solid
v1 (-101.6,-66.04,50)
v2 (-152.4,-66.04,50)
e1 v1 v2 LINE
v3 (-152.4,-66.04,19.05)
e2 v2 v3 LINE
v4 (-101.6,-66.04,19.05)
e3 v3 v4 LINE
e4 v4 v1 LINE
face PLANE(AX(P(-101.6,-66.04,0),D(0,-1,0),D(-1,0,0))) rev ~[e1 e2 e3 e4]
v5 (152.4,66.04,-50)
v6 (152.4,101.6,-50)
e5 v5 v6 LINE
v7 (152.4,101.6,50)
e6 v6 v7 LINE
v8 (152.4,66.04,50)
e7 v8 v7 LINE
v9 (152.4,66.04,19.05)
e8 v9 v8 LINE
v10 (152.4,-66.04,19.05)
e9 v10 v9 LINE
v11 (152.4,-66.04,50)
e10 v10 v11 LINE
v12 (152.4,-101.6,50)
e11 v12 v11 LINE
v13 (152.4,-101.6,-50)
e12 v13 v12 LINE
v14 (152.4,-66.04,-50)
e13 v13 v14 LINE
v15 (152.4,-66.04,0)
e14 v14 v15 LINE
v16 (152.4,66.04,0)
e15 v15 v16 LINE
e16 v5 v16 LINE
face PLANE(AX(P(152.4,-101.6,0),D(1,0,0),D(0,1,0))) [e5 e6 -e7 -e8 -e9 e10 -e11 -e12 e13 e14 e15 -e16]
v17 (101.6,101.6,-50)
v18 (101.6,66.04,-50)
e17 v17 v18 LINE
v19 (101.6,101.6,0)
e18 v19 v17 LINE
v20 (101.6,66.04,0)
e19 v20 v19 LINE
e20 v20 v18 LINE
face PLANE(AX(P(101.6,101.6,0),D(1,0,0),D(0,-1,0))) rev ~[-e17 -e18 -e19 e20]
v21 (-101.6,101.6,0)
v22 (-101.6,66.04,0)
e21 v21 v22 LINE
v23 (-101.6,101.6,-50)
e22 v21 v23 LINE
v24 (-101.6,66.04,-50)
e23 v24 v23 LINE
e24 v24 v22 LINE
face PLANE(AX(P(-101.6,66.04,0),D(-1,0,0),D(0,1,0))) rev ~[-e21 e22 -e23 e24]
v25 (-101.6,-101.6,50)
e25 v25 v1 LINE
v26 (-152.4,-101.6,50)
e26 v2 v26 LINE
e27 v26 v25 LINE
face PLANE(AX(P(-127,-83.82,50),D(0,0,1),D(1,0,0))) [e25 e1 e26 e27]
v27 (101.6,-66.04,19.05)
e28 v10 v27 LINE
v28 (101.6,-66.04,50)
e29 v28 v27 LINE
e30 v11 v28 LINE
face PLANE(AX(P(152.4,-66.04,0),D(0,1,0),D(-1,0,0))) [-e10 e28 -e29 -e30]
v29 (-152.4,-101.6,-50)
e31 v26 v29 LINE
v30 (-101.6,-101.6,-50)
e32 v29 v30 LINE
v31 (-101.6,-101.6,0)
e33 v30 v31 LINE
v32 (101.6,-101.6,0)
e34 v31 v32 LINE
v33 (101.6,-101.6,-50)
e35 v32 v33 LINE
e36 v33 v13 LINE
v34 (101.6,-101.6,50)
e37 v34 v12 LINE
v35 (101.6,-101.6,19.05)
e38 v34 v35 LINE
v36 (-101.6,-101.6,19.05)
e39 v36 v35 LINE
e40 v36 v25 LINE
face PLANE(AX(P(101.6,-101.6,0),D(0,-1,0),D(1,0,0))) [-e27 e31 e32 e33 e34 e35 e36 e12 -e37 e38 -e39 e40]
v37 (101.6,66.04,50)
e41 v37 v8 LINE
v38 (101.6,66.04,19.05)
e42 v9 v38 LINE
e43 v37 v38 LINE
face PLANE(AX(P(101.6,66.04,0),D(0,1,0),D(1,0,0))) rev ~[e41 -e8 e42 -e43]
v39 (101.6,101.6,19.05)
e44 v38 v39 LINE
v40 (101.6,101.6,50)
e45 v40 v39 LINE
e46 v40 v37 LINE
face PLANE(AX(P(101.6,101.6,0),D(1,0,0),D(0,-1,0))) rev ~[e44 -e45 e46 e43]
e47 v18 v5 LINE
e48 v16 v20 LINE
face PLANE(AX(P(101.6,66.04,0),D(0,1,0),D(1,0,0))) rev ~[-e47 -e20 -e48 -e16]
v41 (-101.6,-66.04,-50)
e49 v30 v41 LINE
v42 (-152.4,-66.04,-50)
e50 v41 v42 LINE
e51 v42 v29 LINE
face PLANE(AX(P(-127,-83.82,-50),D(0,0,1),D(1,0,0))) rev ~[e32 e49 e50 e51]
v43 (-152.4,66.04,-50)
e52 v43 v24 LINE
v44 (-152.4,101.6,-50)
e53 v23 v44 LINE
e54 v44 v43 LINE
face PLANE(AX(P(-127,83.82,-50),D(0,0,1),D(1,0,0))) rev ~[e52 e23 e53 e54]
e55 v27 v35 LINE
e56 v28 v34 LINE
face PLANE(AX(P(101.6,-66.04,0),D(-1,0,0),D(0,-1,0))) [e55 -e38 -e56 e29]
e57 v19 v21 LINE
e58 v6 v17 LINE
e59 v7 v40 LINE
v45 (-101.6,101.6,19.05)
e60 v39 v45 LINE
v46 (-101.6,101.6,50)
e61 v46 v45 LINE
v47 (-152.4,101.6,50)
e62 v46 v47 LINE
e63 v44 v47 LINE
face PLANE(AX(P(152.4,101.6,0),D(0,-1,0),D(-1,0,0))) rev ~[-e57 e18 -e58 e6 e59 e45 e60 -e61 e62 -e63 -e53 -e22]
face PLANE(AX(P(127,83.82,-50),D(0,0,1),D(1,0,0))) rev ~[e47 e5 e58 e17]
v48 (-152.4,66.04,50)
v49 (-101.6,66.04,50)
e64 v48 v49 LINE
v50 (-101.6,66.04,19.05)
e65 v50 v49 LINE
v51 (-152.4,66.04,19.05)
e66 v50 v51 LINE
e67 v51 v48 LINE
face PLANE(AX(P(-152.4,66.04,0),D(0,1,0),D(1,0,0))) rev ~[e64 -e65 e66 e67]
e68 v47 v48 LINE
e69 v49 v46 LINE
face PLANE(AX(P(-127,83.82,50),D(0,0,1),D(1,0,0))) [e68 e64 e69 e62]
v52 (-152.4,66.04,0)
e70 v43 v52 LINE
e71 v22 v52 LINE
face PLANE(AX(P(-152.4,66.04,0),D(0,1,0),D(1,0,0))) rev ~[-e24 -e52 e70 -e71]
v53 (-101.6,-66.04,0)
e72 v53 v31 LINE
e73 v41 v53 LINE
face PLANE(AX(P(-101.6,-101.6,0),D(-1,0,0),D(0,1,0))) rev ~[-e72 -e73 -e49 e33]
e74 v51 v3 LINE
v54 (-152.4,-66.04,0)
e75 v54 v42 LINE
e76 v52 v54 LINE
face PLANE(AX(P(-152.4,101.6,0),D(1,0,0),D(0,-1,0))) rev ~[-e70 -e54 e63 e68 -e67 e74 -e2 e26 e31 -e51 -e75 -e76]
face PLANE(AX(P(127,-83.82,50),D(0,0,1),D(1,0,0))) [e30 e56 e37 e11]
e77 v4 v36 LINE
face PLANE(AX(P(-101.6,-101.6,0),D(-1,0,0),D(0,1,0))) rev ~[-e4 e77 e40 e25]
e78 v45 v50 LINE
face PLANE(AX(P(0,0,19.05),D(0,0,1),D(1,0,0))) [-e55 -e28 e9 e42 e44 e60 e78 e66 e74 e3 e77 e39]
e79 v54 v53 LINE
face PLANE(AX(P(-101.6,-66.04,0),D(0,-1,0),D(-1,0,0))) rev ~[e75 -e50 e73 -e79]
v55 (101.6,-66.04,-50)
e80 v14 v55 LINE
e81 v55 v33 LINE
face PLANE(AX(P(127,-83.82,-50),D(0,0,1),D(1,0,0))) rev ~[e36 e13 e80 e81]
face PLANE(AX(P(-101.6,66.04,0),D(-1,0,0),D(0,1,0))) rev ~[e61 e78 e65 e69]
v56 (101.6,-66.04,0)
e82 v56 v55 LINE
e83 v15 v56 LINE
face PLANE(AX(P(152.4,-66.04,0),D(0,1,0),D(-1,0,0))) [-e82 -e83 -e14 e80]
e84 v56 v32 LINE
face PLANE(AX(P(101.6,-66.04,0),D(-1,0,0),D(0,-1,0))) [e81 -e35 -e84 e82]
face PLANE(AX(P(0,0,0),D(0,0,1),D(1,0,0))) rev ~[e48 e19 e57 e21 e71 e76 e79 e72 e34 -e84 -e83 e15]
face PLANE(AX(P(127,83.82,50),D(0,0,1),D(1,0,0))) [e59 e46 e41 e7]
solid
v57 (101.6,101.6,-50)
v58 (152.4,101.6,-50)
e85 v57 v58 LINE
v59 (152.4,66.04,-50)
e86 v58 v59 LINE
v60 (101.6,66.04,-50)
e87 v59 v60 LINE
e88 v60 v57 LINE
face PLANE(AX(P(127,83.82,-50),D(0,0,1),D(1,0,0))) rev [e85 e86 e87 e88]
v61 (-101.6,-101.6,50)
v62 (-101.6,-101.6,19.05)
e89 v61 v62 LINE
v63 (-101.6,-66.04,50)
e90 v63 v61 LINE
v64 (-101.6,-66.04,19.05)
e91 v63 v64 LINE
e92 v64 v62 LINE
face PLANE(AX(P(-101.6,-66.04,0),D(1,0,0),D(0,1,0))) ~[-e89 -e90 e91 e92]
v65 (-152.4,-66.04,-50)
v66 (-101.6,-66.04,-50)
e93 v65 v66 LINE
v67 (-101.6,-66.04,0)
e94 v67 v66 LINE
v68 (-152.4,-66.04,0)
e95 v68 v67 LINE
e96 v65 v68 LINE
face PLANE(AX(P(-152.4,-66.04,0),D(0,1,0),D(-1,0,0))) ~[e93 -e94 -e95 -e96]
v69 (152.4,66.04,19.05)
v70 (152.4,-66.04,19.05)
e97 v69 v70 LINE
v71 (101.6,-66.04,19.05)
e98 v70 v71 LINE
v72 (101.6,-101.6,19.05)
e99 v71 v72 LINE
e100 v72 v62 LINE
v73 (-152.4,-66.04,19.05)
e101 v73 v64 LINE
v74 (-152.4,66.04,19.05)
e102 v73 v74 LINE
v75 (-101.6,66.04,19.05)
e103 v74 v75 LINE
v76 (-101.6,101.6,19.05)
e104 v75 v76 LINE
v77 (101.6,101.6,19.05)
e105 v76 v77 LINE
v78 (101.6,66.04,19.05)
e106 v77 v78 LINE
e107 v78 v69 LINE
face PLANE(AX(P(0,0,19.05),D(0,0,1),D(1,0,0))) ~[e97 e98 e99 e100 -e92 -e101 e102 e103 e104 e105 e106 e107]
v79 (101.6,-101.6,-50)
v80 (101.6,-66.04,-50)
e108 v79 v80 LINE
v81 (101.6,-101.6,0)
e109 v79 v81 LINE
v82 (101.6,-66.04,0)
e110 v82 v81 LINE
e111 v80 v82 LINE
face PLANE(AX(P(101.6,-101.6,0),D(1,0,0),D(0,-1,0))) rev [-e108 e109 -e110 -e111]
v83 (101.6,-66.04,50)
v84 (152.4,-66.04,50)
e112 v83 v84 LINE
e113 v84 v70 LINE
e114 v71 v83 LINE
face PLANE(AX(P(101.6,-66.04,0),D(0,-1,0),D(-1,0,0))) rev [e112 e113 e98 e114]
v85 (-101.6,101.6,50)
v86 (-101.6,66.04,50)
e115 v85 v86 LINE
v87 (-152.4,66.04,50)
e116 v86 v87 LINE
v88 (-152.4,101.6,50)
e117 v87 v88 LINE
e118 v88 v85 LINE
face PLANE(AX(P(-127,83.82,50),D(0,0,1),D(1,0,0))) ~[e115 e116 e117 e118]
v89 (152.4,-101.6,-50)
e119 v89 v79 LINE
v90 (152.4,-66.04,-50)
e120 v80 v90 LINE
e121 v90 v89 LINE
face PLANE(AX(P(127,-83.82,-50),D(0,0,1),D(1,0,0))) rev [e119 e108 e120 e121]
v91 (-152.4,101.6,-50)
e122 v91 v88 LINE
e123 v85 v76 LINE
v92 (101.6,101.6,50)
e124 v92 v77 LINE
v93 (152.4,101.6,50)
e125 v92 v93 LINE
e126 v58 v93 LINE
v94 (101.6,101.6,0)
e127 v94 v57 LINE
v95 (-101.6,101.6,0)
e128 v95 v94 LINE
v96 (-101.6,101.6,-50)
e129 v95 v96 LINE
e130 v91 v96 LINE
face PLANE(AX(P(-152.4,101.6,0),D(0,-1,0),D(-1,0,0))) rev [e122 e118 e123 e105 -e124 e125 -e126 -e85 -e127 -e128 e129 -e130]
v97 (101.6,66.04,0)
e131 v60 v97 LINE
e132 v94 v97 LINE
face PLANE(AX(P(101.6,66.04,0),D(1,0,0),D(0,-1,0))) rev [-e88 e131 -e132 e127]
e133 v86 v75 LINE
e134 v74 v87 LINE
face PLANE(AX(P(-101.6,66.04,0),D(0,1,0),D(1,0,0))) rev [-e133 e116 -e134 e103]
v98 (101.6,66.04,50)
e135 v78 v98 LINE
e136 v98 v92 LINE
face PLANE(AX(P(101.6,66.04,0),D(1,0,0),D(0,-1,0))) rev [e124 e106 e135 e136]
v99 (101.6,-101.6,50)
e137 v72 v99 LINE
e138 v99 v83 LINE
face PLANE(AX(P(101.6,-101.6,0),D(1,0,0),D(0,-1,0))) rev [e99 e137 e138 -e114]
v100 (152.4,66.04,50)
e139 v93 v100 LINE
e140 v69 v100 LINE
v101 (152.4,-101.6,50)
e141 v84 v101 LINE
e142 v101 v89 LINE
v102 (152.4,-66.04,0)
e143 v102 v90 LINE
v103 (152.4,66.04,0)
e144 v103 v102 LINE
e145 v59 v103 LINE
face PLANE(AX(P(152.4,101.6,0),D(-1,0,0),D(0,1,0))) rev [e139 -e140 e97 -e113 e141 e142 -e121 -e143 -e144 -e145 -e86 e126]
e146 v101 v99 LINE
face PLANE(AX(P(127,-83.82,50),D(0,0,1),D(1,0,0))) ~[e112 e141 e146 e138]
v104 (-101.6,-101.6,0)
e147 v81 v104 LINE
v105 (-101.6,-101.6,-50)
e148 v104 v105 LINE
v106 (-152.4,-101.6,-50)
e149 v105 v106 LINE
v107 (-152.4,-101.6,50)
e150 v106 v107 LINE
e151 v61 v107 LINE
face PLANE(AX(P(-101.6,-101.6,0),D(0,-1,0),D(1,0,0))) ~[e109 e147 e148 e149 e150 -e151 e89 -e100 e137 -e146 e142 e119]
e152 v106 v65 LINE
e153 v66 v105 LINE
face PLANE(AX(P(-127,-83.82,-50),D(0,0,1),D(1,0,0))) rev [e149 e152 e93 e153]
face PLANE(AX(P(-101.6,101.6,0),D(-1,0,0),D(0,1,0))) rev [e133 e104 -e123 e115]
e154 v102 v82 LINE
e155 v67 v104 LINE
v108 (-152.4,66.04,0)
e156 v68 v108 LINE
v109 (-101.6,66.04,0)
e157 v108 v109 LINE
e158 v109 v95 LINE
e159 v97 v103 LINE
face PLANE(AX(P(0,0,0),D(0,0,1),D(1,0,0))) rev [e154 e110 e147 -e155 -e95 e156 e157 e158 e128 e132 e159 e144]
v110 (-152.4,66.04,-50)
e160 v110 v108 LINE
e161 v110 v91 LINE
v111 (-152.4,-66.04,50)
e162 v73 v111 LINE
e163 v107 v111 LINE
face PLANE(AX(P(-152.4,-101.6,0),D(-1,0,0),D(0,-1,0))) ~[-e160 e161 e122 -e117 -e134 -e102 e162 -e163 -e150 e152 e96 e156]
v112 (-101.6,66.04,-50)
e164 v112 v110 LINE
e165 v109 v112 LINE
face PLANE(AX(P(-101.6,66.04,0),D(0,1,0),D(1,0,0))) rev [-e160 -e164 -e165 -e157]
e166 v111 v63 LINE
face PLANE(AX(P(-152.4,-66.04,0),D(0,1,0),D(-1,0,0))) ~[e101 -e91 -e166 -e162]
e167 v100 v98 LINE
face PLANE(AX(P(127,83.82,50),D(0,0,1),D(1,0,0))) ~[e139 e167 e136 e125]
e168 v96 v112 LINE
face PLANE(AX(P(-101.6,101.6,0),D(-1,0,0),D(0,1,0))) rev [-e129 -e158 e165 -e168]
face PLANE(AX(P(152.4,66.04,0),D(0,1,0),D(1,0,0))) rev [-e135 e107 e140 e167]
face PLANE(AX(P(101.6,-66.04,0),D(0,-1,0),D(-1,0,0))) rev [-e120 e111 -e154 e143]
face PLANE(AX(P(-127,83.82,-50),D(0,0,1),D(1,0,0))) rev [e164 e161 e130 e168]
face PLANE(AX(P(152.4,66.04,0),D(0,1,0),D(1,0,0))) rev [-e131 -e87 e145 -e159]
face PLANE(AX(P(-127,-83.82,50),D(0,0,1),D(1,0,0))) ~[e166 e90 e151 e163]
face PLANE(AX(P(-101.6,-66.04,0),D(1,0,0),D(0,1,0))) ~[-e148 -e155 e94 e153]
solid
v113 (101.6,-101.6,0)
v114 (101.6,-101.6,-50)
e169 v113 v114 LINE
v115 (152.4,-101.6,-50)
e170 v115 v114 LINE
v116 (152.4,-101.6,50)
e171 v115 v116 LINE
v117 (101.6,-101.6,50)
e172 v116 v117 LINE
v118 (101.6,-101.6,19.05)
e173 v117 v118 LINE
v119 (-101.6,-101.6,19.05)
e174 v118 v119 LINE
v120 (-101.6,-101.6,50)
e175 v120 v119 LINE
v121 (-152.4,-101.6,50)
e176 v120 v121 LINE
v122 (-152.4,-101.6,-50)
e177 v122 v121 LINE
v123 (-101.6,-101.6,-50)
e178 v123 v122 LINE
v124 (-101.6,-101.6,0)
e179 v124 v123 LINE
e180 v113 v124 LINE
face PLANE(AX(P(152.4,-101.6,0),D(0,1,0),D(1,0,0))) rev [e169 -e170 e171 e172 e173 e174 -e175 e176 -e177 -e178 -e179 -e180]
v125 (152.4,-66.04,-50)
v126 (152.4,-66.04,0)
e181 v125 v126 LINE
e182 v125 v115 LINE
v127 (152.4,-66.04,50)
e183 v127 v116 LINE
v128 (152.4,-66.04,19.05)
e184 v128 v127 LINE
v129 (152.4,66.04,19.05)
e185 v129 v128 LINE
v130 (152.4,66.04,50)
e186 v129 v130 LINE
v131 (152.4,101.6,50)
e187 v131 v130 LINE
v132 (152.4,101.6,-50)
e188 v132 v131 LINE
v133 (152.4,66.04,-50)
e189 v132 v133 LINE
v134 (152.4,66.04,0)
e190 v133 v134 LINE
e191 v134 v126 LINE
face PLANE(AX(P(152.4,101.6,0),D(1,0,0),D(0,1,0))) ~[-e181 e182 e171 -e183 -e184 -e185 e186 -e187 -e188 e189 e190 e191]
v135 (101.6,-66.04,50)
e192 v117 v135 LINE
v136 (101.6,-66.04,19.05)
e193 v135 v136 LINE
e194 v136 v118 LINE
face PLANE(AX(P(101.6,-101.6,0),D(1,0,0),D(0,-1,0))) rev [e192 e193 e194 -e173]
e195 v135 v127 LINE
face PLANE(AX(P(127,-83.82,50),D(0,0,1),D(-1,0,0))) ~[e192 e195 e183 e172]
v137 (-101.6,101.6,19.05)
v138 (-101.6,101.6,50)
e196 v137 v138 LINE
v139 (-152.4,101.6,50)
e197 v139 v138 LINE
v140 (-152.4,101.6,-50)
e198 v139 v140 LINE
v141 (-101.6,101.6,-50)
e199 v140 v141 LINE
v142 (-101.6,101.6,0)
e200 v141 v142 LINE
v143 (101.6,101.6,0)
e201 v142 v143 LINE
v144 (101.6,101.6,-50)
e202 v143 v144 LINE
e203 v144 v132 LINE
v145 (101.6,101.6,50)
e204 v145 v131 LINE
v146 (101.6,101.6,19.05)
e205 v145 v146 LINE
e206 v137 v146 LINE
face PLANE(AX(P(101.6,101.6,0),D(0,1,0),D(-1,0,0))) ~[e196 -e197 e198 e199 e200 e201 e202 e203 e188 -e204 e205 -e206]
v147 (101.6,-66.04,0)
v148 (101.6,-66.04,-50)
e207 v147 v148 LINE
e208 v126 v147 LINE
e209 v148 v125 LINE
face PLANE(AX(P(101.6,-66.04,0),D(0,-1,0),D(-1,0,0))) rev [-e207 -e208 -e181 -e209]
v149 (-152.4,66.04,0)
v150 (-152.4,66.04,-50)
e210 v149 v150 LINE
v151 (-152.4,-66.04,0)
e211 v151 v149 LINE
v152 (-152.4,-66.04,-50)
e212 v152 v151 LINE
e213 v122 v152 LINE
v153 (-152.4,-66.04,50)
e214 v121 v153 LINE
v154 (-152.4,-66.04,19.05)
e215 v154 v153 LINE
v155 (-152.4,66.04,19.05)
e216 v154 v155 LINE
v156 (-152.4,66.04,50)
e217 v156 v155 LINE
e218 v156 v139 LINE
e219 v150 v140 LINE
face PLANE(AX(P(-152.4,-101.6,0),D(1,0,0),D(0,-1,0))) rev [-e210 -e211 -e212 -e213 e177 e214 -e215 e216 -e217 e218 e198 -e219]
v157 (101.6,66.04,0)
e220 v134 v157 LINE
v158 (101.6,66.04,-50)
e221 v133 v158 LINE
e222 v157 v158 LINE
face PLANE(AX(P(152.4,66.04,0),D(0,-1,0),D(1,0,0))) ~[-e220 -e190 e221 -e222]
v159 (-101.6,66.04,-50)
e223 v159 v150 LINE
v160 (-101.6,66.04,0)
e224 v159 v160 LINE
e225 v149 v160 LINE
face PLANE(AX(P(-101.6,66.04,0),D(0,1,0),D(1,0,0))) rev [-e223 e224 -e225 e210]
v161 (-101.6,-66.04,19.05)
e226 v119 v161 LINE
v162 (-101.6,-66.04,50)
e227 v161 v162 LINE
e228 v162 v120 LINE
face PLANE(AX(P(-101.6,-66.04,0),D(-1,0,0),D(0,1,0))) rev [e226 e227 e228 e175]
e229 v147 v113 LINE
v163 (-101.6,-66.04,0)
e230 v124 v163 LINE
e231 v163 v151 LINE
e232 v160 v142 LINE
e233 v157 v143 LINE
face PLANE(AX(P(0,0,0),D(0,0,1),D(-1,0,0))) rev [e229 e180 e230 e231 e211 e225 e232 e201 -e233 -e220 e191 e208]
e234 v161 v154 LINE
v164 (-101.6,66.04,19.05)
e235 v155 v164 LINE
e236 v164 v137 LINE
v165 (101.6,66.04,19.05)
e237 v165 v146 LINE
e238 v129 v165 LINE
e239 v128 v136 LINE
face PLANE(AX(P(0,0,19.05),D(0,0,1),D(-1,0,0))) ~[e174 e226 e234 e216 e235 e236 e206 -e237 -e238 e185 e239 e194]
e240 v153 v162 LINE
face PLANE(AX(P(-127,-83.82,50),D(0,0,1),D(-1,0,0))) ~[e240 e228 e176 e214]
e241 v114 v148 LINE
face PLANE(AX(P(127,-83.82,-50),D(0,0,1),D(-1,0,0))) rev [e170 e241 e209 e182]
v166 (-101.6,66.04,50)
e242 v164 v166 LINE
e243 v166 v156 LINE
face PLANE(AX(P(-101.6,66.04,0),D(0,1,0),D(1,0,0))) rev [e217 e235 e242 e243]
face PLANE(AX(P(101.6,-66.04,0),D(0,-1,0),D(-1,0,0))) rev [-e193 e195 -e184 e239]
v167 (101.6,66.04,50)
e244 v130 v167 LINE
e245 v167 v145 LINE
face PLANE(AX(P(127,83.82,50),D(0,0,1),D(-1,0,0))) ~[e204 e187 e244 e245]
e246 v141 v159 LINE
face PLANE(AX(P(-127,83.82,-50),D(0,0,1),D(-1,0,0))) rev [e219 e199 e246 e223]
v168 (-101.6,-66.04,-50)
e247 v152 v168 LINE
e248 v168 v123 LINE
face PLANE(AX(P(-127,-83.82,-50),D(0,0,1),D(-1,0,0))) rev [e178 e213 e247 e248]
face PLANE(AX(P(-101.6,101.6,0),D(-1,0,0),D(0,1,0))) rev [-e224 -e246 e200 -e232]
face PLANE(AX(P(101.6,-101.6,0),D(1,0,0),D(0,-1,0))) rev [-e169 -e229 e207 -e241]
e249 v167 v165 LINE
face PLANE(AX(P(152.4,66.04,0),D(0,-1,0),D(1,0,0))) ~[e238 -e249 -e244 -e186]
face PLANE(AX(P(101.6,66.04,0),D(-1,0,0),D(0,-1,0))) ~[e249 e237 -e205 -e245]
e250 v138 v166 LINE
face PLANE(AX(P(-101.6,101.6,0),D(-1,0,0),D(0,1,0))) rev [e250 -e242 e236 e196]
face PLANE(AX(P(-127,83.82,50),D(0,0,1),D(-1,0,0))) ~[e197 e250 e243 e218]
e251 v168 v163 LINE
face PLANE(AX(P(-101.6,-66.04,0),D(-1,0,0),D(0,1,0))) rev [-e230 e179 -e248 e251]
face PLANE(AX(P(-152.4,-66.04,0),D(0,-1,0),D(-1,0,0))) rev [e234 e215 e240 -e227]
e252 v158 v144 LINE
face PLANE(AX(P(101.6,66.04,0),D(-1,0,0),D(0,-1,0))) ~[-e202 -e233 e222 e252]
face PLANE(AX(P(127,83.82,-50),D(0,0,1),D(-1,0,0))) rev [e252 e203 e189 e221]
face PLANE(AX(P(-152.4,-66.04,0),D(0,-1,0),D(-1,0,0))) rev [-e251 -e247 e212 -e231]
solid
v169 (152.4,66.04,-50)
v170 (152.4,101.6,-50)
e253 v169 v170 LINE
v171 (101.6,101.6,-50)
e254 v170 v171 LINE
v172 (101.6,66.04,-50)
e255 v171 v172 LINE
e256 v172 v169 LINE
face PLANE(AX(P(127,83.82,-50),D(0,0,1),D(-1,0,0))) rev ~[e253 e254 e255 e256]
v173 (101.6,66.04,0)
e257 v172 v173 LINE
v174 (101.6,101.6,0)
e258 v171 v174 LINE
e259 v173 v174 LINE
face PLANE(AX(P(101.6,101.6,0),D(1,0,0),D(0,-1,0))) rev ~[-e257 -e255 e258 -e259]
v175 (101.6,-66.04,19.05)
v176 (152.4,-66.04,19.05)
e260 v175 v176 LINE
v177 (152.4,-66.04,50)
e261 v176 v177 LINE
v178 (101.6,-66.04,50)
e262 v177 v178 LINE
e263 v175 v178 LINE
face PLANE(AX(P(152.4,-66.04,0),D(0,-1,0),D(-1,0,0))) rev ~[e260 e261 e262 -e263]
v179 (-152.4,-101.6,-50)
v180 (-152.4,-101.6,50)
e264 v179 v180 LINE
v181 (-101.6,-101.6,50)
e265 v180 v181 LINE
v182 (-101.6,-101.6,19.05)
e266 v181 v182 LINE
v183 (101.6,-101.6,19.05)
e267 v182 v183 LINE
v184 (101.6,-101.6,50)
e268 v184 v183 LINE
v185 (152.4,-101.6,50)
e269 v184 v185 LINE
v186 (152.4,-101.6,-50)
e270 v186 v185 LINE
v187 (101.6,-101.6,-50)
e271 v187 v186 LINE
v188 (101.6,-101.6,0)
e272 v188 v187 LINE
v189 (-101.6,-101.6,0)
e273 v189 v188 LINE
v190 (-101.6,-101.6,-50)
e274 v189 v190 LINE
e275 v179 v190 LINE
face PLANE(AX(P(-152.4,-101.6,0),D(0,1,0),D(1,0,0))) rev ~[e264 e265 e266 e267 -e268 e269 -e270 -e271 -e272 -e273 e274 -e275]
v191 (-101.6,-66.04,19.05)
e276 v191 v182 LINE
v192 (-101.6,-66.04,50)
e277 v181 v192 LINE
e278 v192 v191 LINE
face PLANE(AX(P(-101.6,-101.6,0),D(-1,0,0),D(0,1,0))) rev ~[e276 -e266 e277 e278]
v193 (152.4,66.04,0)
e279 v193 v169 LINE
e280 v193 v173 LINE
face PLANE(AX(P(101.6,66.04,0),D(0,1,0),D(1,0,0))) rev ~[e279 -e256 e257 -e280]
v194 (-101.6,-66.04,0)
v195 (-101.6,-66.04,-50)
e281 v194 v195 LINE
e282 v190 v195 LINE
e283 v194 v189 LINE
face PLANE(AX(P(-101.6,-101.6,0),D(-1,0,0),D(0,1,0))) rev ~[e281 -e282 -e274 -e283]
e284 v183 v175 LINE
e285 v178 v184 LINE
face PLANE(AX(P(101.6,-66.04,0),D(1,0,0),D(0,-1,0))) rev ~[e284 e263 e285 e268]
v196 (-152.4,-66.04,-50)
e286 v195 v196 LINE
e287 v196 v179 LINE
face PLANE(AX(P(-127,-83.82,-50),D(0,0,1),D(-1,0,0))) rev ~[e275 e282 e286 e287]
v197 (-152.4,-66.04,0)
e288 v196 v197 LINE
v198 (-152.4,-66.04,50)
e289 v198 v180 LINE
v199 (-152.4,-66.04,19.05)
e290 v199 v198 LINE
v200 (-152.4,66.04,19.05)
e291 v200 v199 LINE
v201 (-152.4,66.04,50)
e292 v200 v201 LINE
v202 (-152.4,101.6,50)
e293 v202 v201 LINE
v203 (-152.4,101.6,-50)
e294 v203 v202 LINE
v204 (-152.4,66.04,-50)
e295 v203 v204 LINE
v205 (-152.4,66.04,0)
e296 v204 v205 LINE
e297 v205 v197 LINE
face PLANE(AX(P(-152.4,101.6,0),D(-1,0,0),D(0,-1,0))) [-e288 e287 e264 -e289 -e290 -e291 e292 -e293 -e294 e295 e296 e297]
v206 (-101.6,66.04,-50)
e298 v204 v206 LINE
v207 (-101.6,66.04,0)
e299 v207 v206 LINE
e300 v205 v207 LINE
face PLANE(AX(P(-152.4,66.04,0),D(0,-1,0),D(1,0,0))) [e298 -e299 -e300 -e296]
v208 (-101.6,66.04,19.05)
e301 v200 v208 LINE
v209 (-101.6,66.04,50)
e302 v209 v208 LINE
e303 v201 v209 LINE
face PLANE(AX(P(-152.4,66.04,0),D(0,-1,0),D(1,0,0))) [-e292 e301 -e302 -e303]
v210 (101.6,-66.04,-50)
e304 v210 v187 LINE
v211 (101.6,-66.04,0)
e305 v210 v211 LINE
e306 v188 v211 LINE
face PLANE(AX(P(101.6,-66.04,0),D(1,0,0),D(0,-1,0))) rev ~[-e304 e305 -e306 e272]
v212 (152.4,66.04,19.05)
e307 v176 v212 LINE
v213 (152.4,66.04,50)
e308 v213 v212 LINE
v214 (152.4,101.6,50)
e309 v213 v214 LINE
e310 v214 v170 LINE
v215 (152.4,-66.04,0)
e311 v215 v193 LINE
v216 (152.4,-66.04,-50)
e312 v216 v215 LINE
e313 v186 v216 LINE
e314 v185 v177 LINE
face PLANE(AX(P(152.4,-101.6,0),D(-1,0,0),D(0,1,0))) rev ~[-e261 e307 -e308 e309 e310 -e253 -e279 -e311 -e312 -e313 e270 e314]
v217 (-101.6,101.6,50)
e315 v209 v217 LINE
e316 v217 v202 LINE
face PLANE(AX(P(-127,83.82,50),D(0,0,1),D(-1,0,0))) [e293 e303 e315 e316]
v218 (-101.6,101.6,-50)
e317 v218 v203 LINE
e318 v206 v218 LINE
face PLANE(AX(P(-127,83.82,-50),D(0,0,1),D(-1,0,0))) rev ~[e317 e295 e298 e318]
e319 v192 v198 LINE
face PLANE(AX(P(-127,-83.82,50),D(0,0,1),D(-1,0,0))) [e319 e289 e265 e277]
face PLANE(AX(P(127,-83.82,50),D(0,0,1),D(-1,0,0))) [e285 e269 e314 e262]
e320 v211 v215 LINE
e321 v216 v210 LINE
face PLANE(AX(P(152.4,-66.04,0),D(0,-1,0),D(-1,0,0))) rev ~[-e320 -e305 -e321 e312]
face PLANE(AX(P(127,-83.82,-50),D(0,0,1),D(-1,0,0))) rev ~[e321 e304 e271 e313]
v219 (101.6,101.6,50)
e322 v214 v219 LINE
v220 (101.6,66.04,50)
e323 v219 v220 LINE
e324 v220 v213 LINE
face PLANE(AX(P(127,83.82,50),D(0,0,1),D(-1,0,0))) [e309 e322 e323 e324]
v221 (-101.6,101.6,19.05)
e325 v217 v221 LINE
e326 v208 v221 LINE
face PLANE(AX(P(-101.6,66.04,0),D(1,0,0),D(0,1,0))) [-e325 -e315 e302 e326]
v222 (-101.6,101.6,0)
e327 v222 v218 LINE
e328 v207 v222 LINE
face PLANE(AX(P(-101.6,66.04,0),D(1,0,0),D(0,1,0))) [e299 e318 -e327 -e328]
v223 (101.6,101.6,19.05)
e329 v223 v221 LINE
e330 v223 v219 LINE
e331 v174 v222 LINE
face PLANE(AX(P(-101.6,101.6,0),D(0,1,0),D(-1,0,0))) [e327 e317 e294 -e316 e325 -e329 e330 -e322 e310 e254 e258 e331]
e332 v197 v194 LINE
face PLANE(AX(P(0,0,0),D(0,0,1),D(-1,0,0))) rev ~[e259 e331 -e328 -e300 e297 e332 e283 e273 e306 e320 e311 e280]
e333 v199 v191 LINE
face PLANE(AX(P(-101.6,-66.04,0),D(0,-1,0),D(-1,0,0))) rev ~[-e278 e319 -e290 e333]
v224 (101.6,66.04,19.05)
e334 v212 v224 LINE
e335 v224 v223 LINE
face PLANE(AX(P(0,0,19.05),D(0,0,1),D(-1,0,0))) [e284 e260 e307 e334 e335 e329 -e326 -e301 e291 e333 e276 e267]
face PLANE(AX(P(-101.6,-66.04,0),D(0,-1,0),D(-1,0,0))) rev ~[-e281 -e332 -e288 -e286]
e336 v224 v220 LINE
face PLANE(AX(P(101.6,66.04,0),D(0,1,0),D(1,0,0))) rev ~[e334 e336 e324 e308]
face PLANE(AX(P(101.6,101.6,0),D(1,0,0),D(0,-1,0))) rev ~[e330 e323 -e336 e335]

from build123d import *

# Parameters (mm, degrees)
F0_W      = 304.8
F0_H      = 20.32
F1_DEPTH  = 19.05
F2_DEPTH  = 50
F10_DEPTH = 79.4


# Not quite as in the source:
# - a feature names something its author has since deleted; it is built from what else it names


with BuildPart() as f1:
    # F0 (on Top) → F1 (new body)
    with BuildSketch(Plane.XY):
        Rectangle(F0_W, F0_H)
        Polygon((-152.4, 10.16), (152.4, 10.16), (152.4, 66.04), (101.6, 66.04), (101.6, 83.82), (-101.6, 85.344), (-101.6, 66.04), (-152.4, 66.04), align=None)
        Polygon((-101.6, -101.6), (101.6, -101.6), (101.6, -83.82), (-101.6, -85.344), align=None)
        Polygon((101.6, 83.82), (101.6, 101.6), (-101.6, 101.6), (-101.6, 85.344), align=None)
        Polygon((101.6, -66.04), (152.4, -66.04), (152.4, -10.16), (-152.4, -10.16), (-152.4, -66.04), (-101.6, -66.04), (-101.6, -85.344), (101.6, -83.82), align=None)
        Polygon((-152.4, 101.6), (-152.4, 66.04), (-101.6, 66.04), (-101.6, 85.344), (-101.6, 101.6), align=None)
        Polygon((-152.4, -101.6), (-101.6, -101.6), (-101.6, -85.344), (-101.6, -66.04), (-152.4, -66.04), align=None)
        Polygon((101.6, -101.6), (152.4, -101.6), (152.4, -66.04), (101.6, -66.04), (101.6, -83.82), align=None)
        Polygon((101.6, 66.04), (152.4, 66.04), (152.4, 101.6), (101.6, 101.6), (101.6, 83.82), align=None)
    extrude(amount=F1_DEPTH)

    # F0 (on Top) → F2 (join, symmetric)
    with BuildSketch(Plane.XY):
        Polygon((-152.4, -101.6), (-101.6, -101.6), (-101.6, -85.344), (-101.6, -66.04), (-152.4, -66.04), align=None)
        Polygon((-152.4, 101.6), (-152.4, 66.04), (-101.6, 66.04), (-101.6, 85.344), (-101.6, 101.6), align=None)
        Polygon((101.6, 66.04), (152.4, 66.04), (152.4, 101.6), (101.6, 101.6), (101.6, 83.82), align=None)
        Polygon((101.6, -101.6), (152.4, -101.6), (152.4, -66.04), (101.6, -66.04), (101.6, -83.82), align=None)
    extrude(amount=F2_DEPTH, both=True)


with BuildPart() as f7_1:
    # F7: instance of F1
    add(f1.part.mirror(Plane.XZ))


with BuildPart() as f8_1:
    # F8: instance of F7_1
    add(f7_1.part.mirror(Plane.YZ))


with BuildPart() as f8_2:
    # F8: instance of F1
    add(f1.part.mirror(Plane.YZ))


with BuildPart() as f1_1:
    add(f1.part)

    # F9 (on face) → F10 (cut)
    with BuildSketch(Plane.XZ.offset(101.6)):
        with BuildLine():
            ThreePointArc((-28.6936778575, 19.2373767495), (-46.8099126592, 32.3162109562), (-64.9261474609, 19.2373767495))
            Line((-64.9261474609, 19.2373767495), (-28.6936778575, 19.2373767495))
        make_face()
        with BuildLine():
            ThreePointArc((71.8333274126, 19.2373767495), (61.1908975989, 30.3037829778), (50.5484677851, 19.2373767495))
            Line((50.5484677851, 19.2373767495), (71.8333274126, 19.2373767495))
        make_face()
        with BuildLine():
            ThreePointArc((48.6789308488, 19.2373767495), (31.709279865, 31.1125167708), (14.7396288812, 19.2373767495))
            Line((14.7396288812, 19.2373767495), (48.6789308488, 19.2373767495))
        make_face()
        with BuildLine():
            ThreePointArc((11.0462261364, 19.2373767495), (-7.4003641494, 32.1407625343), (-25.8469544351, 19.2373767495))
            Line((-25.8469544351, 19.2373767495), (11.0462261364, 19.2373767495))
        make_face()
    extrude(amount=-F10_DEPTH, mode=Mode.SUBTRACT)


solid = Compound([f7_1.part, f8_1.part, f8_2.part, f1_1.part])
